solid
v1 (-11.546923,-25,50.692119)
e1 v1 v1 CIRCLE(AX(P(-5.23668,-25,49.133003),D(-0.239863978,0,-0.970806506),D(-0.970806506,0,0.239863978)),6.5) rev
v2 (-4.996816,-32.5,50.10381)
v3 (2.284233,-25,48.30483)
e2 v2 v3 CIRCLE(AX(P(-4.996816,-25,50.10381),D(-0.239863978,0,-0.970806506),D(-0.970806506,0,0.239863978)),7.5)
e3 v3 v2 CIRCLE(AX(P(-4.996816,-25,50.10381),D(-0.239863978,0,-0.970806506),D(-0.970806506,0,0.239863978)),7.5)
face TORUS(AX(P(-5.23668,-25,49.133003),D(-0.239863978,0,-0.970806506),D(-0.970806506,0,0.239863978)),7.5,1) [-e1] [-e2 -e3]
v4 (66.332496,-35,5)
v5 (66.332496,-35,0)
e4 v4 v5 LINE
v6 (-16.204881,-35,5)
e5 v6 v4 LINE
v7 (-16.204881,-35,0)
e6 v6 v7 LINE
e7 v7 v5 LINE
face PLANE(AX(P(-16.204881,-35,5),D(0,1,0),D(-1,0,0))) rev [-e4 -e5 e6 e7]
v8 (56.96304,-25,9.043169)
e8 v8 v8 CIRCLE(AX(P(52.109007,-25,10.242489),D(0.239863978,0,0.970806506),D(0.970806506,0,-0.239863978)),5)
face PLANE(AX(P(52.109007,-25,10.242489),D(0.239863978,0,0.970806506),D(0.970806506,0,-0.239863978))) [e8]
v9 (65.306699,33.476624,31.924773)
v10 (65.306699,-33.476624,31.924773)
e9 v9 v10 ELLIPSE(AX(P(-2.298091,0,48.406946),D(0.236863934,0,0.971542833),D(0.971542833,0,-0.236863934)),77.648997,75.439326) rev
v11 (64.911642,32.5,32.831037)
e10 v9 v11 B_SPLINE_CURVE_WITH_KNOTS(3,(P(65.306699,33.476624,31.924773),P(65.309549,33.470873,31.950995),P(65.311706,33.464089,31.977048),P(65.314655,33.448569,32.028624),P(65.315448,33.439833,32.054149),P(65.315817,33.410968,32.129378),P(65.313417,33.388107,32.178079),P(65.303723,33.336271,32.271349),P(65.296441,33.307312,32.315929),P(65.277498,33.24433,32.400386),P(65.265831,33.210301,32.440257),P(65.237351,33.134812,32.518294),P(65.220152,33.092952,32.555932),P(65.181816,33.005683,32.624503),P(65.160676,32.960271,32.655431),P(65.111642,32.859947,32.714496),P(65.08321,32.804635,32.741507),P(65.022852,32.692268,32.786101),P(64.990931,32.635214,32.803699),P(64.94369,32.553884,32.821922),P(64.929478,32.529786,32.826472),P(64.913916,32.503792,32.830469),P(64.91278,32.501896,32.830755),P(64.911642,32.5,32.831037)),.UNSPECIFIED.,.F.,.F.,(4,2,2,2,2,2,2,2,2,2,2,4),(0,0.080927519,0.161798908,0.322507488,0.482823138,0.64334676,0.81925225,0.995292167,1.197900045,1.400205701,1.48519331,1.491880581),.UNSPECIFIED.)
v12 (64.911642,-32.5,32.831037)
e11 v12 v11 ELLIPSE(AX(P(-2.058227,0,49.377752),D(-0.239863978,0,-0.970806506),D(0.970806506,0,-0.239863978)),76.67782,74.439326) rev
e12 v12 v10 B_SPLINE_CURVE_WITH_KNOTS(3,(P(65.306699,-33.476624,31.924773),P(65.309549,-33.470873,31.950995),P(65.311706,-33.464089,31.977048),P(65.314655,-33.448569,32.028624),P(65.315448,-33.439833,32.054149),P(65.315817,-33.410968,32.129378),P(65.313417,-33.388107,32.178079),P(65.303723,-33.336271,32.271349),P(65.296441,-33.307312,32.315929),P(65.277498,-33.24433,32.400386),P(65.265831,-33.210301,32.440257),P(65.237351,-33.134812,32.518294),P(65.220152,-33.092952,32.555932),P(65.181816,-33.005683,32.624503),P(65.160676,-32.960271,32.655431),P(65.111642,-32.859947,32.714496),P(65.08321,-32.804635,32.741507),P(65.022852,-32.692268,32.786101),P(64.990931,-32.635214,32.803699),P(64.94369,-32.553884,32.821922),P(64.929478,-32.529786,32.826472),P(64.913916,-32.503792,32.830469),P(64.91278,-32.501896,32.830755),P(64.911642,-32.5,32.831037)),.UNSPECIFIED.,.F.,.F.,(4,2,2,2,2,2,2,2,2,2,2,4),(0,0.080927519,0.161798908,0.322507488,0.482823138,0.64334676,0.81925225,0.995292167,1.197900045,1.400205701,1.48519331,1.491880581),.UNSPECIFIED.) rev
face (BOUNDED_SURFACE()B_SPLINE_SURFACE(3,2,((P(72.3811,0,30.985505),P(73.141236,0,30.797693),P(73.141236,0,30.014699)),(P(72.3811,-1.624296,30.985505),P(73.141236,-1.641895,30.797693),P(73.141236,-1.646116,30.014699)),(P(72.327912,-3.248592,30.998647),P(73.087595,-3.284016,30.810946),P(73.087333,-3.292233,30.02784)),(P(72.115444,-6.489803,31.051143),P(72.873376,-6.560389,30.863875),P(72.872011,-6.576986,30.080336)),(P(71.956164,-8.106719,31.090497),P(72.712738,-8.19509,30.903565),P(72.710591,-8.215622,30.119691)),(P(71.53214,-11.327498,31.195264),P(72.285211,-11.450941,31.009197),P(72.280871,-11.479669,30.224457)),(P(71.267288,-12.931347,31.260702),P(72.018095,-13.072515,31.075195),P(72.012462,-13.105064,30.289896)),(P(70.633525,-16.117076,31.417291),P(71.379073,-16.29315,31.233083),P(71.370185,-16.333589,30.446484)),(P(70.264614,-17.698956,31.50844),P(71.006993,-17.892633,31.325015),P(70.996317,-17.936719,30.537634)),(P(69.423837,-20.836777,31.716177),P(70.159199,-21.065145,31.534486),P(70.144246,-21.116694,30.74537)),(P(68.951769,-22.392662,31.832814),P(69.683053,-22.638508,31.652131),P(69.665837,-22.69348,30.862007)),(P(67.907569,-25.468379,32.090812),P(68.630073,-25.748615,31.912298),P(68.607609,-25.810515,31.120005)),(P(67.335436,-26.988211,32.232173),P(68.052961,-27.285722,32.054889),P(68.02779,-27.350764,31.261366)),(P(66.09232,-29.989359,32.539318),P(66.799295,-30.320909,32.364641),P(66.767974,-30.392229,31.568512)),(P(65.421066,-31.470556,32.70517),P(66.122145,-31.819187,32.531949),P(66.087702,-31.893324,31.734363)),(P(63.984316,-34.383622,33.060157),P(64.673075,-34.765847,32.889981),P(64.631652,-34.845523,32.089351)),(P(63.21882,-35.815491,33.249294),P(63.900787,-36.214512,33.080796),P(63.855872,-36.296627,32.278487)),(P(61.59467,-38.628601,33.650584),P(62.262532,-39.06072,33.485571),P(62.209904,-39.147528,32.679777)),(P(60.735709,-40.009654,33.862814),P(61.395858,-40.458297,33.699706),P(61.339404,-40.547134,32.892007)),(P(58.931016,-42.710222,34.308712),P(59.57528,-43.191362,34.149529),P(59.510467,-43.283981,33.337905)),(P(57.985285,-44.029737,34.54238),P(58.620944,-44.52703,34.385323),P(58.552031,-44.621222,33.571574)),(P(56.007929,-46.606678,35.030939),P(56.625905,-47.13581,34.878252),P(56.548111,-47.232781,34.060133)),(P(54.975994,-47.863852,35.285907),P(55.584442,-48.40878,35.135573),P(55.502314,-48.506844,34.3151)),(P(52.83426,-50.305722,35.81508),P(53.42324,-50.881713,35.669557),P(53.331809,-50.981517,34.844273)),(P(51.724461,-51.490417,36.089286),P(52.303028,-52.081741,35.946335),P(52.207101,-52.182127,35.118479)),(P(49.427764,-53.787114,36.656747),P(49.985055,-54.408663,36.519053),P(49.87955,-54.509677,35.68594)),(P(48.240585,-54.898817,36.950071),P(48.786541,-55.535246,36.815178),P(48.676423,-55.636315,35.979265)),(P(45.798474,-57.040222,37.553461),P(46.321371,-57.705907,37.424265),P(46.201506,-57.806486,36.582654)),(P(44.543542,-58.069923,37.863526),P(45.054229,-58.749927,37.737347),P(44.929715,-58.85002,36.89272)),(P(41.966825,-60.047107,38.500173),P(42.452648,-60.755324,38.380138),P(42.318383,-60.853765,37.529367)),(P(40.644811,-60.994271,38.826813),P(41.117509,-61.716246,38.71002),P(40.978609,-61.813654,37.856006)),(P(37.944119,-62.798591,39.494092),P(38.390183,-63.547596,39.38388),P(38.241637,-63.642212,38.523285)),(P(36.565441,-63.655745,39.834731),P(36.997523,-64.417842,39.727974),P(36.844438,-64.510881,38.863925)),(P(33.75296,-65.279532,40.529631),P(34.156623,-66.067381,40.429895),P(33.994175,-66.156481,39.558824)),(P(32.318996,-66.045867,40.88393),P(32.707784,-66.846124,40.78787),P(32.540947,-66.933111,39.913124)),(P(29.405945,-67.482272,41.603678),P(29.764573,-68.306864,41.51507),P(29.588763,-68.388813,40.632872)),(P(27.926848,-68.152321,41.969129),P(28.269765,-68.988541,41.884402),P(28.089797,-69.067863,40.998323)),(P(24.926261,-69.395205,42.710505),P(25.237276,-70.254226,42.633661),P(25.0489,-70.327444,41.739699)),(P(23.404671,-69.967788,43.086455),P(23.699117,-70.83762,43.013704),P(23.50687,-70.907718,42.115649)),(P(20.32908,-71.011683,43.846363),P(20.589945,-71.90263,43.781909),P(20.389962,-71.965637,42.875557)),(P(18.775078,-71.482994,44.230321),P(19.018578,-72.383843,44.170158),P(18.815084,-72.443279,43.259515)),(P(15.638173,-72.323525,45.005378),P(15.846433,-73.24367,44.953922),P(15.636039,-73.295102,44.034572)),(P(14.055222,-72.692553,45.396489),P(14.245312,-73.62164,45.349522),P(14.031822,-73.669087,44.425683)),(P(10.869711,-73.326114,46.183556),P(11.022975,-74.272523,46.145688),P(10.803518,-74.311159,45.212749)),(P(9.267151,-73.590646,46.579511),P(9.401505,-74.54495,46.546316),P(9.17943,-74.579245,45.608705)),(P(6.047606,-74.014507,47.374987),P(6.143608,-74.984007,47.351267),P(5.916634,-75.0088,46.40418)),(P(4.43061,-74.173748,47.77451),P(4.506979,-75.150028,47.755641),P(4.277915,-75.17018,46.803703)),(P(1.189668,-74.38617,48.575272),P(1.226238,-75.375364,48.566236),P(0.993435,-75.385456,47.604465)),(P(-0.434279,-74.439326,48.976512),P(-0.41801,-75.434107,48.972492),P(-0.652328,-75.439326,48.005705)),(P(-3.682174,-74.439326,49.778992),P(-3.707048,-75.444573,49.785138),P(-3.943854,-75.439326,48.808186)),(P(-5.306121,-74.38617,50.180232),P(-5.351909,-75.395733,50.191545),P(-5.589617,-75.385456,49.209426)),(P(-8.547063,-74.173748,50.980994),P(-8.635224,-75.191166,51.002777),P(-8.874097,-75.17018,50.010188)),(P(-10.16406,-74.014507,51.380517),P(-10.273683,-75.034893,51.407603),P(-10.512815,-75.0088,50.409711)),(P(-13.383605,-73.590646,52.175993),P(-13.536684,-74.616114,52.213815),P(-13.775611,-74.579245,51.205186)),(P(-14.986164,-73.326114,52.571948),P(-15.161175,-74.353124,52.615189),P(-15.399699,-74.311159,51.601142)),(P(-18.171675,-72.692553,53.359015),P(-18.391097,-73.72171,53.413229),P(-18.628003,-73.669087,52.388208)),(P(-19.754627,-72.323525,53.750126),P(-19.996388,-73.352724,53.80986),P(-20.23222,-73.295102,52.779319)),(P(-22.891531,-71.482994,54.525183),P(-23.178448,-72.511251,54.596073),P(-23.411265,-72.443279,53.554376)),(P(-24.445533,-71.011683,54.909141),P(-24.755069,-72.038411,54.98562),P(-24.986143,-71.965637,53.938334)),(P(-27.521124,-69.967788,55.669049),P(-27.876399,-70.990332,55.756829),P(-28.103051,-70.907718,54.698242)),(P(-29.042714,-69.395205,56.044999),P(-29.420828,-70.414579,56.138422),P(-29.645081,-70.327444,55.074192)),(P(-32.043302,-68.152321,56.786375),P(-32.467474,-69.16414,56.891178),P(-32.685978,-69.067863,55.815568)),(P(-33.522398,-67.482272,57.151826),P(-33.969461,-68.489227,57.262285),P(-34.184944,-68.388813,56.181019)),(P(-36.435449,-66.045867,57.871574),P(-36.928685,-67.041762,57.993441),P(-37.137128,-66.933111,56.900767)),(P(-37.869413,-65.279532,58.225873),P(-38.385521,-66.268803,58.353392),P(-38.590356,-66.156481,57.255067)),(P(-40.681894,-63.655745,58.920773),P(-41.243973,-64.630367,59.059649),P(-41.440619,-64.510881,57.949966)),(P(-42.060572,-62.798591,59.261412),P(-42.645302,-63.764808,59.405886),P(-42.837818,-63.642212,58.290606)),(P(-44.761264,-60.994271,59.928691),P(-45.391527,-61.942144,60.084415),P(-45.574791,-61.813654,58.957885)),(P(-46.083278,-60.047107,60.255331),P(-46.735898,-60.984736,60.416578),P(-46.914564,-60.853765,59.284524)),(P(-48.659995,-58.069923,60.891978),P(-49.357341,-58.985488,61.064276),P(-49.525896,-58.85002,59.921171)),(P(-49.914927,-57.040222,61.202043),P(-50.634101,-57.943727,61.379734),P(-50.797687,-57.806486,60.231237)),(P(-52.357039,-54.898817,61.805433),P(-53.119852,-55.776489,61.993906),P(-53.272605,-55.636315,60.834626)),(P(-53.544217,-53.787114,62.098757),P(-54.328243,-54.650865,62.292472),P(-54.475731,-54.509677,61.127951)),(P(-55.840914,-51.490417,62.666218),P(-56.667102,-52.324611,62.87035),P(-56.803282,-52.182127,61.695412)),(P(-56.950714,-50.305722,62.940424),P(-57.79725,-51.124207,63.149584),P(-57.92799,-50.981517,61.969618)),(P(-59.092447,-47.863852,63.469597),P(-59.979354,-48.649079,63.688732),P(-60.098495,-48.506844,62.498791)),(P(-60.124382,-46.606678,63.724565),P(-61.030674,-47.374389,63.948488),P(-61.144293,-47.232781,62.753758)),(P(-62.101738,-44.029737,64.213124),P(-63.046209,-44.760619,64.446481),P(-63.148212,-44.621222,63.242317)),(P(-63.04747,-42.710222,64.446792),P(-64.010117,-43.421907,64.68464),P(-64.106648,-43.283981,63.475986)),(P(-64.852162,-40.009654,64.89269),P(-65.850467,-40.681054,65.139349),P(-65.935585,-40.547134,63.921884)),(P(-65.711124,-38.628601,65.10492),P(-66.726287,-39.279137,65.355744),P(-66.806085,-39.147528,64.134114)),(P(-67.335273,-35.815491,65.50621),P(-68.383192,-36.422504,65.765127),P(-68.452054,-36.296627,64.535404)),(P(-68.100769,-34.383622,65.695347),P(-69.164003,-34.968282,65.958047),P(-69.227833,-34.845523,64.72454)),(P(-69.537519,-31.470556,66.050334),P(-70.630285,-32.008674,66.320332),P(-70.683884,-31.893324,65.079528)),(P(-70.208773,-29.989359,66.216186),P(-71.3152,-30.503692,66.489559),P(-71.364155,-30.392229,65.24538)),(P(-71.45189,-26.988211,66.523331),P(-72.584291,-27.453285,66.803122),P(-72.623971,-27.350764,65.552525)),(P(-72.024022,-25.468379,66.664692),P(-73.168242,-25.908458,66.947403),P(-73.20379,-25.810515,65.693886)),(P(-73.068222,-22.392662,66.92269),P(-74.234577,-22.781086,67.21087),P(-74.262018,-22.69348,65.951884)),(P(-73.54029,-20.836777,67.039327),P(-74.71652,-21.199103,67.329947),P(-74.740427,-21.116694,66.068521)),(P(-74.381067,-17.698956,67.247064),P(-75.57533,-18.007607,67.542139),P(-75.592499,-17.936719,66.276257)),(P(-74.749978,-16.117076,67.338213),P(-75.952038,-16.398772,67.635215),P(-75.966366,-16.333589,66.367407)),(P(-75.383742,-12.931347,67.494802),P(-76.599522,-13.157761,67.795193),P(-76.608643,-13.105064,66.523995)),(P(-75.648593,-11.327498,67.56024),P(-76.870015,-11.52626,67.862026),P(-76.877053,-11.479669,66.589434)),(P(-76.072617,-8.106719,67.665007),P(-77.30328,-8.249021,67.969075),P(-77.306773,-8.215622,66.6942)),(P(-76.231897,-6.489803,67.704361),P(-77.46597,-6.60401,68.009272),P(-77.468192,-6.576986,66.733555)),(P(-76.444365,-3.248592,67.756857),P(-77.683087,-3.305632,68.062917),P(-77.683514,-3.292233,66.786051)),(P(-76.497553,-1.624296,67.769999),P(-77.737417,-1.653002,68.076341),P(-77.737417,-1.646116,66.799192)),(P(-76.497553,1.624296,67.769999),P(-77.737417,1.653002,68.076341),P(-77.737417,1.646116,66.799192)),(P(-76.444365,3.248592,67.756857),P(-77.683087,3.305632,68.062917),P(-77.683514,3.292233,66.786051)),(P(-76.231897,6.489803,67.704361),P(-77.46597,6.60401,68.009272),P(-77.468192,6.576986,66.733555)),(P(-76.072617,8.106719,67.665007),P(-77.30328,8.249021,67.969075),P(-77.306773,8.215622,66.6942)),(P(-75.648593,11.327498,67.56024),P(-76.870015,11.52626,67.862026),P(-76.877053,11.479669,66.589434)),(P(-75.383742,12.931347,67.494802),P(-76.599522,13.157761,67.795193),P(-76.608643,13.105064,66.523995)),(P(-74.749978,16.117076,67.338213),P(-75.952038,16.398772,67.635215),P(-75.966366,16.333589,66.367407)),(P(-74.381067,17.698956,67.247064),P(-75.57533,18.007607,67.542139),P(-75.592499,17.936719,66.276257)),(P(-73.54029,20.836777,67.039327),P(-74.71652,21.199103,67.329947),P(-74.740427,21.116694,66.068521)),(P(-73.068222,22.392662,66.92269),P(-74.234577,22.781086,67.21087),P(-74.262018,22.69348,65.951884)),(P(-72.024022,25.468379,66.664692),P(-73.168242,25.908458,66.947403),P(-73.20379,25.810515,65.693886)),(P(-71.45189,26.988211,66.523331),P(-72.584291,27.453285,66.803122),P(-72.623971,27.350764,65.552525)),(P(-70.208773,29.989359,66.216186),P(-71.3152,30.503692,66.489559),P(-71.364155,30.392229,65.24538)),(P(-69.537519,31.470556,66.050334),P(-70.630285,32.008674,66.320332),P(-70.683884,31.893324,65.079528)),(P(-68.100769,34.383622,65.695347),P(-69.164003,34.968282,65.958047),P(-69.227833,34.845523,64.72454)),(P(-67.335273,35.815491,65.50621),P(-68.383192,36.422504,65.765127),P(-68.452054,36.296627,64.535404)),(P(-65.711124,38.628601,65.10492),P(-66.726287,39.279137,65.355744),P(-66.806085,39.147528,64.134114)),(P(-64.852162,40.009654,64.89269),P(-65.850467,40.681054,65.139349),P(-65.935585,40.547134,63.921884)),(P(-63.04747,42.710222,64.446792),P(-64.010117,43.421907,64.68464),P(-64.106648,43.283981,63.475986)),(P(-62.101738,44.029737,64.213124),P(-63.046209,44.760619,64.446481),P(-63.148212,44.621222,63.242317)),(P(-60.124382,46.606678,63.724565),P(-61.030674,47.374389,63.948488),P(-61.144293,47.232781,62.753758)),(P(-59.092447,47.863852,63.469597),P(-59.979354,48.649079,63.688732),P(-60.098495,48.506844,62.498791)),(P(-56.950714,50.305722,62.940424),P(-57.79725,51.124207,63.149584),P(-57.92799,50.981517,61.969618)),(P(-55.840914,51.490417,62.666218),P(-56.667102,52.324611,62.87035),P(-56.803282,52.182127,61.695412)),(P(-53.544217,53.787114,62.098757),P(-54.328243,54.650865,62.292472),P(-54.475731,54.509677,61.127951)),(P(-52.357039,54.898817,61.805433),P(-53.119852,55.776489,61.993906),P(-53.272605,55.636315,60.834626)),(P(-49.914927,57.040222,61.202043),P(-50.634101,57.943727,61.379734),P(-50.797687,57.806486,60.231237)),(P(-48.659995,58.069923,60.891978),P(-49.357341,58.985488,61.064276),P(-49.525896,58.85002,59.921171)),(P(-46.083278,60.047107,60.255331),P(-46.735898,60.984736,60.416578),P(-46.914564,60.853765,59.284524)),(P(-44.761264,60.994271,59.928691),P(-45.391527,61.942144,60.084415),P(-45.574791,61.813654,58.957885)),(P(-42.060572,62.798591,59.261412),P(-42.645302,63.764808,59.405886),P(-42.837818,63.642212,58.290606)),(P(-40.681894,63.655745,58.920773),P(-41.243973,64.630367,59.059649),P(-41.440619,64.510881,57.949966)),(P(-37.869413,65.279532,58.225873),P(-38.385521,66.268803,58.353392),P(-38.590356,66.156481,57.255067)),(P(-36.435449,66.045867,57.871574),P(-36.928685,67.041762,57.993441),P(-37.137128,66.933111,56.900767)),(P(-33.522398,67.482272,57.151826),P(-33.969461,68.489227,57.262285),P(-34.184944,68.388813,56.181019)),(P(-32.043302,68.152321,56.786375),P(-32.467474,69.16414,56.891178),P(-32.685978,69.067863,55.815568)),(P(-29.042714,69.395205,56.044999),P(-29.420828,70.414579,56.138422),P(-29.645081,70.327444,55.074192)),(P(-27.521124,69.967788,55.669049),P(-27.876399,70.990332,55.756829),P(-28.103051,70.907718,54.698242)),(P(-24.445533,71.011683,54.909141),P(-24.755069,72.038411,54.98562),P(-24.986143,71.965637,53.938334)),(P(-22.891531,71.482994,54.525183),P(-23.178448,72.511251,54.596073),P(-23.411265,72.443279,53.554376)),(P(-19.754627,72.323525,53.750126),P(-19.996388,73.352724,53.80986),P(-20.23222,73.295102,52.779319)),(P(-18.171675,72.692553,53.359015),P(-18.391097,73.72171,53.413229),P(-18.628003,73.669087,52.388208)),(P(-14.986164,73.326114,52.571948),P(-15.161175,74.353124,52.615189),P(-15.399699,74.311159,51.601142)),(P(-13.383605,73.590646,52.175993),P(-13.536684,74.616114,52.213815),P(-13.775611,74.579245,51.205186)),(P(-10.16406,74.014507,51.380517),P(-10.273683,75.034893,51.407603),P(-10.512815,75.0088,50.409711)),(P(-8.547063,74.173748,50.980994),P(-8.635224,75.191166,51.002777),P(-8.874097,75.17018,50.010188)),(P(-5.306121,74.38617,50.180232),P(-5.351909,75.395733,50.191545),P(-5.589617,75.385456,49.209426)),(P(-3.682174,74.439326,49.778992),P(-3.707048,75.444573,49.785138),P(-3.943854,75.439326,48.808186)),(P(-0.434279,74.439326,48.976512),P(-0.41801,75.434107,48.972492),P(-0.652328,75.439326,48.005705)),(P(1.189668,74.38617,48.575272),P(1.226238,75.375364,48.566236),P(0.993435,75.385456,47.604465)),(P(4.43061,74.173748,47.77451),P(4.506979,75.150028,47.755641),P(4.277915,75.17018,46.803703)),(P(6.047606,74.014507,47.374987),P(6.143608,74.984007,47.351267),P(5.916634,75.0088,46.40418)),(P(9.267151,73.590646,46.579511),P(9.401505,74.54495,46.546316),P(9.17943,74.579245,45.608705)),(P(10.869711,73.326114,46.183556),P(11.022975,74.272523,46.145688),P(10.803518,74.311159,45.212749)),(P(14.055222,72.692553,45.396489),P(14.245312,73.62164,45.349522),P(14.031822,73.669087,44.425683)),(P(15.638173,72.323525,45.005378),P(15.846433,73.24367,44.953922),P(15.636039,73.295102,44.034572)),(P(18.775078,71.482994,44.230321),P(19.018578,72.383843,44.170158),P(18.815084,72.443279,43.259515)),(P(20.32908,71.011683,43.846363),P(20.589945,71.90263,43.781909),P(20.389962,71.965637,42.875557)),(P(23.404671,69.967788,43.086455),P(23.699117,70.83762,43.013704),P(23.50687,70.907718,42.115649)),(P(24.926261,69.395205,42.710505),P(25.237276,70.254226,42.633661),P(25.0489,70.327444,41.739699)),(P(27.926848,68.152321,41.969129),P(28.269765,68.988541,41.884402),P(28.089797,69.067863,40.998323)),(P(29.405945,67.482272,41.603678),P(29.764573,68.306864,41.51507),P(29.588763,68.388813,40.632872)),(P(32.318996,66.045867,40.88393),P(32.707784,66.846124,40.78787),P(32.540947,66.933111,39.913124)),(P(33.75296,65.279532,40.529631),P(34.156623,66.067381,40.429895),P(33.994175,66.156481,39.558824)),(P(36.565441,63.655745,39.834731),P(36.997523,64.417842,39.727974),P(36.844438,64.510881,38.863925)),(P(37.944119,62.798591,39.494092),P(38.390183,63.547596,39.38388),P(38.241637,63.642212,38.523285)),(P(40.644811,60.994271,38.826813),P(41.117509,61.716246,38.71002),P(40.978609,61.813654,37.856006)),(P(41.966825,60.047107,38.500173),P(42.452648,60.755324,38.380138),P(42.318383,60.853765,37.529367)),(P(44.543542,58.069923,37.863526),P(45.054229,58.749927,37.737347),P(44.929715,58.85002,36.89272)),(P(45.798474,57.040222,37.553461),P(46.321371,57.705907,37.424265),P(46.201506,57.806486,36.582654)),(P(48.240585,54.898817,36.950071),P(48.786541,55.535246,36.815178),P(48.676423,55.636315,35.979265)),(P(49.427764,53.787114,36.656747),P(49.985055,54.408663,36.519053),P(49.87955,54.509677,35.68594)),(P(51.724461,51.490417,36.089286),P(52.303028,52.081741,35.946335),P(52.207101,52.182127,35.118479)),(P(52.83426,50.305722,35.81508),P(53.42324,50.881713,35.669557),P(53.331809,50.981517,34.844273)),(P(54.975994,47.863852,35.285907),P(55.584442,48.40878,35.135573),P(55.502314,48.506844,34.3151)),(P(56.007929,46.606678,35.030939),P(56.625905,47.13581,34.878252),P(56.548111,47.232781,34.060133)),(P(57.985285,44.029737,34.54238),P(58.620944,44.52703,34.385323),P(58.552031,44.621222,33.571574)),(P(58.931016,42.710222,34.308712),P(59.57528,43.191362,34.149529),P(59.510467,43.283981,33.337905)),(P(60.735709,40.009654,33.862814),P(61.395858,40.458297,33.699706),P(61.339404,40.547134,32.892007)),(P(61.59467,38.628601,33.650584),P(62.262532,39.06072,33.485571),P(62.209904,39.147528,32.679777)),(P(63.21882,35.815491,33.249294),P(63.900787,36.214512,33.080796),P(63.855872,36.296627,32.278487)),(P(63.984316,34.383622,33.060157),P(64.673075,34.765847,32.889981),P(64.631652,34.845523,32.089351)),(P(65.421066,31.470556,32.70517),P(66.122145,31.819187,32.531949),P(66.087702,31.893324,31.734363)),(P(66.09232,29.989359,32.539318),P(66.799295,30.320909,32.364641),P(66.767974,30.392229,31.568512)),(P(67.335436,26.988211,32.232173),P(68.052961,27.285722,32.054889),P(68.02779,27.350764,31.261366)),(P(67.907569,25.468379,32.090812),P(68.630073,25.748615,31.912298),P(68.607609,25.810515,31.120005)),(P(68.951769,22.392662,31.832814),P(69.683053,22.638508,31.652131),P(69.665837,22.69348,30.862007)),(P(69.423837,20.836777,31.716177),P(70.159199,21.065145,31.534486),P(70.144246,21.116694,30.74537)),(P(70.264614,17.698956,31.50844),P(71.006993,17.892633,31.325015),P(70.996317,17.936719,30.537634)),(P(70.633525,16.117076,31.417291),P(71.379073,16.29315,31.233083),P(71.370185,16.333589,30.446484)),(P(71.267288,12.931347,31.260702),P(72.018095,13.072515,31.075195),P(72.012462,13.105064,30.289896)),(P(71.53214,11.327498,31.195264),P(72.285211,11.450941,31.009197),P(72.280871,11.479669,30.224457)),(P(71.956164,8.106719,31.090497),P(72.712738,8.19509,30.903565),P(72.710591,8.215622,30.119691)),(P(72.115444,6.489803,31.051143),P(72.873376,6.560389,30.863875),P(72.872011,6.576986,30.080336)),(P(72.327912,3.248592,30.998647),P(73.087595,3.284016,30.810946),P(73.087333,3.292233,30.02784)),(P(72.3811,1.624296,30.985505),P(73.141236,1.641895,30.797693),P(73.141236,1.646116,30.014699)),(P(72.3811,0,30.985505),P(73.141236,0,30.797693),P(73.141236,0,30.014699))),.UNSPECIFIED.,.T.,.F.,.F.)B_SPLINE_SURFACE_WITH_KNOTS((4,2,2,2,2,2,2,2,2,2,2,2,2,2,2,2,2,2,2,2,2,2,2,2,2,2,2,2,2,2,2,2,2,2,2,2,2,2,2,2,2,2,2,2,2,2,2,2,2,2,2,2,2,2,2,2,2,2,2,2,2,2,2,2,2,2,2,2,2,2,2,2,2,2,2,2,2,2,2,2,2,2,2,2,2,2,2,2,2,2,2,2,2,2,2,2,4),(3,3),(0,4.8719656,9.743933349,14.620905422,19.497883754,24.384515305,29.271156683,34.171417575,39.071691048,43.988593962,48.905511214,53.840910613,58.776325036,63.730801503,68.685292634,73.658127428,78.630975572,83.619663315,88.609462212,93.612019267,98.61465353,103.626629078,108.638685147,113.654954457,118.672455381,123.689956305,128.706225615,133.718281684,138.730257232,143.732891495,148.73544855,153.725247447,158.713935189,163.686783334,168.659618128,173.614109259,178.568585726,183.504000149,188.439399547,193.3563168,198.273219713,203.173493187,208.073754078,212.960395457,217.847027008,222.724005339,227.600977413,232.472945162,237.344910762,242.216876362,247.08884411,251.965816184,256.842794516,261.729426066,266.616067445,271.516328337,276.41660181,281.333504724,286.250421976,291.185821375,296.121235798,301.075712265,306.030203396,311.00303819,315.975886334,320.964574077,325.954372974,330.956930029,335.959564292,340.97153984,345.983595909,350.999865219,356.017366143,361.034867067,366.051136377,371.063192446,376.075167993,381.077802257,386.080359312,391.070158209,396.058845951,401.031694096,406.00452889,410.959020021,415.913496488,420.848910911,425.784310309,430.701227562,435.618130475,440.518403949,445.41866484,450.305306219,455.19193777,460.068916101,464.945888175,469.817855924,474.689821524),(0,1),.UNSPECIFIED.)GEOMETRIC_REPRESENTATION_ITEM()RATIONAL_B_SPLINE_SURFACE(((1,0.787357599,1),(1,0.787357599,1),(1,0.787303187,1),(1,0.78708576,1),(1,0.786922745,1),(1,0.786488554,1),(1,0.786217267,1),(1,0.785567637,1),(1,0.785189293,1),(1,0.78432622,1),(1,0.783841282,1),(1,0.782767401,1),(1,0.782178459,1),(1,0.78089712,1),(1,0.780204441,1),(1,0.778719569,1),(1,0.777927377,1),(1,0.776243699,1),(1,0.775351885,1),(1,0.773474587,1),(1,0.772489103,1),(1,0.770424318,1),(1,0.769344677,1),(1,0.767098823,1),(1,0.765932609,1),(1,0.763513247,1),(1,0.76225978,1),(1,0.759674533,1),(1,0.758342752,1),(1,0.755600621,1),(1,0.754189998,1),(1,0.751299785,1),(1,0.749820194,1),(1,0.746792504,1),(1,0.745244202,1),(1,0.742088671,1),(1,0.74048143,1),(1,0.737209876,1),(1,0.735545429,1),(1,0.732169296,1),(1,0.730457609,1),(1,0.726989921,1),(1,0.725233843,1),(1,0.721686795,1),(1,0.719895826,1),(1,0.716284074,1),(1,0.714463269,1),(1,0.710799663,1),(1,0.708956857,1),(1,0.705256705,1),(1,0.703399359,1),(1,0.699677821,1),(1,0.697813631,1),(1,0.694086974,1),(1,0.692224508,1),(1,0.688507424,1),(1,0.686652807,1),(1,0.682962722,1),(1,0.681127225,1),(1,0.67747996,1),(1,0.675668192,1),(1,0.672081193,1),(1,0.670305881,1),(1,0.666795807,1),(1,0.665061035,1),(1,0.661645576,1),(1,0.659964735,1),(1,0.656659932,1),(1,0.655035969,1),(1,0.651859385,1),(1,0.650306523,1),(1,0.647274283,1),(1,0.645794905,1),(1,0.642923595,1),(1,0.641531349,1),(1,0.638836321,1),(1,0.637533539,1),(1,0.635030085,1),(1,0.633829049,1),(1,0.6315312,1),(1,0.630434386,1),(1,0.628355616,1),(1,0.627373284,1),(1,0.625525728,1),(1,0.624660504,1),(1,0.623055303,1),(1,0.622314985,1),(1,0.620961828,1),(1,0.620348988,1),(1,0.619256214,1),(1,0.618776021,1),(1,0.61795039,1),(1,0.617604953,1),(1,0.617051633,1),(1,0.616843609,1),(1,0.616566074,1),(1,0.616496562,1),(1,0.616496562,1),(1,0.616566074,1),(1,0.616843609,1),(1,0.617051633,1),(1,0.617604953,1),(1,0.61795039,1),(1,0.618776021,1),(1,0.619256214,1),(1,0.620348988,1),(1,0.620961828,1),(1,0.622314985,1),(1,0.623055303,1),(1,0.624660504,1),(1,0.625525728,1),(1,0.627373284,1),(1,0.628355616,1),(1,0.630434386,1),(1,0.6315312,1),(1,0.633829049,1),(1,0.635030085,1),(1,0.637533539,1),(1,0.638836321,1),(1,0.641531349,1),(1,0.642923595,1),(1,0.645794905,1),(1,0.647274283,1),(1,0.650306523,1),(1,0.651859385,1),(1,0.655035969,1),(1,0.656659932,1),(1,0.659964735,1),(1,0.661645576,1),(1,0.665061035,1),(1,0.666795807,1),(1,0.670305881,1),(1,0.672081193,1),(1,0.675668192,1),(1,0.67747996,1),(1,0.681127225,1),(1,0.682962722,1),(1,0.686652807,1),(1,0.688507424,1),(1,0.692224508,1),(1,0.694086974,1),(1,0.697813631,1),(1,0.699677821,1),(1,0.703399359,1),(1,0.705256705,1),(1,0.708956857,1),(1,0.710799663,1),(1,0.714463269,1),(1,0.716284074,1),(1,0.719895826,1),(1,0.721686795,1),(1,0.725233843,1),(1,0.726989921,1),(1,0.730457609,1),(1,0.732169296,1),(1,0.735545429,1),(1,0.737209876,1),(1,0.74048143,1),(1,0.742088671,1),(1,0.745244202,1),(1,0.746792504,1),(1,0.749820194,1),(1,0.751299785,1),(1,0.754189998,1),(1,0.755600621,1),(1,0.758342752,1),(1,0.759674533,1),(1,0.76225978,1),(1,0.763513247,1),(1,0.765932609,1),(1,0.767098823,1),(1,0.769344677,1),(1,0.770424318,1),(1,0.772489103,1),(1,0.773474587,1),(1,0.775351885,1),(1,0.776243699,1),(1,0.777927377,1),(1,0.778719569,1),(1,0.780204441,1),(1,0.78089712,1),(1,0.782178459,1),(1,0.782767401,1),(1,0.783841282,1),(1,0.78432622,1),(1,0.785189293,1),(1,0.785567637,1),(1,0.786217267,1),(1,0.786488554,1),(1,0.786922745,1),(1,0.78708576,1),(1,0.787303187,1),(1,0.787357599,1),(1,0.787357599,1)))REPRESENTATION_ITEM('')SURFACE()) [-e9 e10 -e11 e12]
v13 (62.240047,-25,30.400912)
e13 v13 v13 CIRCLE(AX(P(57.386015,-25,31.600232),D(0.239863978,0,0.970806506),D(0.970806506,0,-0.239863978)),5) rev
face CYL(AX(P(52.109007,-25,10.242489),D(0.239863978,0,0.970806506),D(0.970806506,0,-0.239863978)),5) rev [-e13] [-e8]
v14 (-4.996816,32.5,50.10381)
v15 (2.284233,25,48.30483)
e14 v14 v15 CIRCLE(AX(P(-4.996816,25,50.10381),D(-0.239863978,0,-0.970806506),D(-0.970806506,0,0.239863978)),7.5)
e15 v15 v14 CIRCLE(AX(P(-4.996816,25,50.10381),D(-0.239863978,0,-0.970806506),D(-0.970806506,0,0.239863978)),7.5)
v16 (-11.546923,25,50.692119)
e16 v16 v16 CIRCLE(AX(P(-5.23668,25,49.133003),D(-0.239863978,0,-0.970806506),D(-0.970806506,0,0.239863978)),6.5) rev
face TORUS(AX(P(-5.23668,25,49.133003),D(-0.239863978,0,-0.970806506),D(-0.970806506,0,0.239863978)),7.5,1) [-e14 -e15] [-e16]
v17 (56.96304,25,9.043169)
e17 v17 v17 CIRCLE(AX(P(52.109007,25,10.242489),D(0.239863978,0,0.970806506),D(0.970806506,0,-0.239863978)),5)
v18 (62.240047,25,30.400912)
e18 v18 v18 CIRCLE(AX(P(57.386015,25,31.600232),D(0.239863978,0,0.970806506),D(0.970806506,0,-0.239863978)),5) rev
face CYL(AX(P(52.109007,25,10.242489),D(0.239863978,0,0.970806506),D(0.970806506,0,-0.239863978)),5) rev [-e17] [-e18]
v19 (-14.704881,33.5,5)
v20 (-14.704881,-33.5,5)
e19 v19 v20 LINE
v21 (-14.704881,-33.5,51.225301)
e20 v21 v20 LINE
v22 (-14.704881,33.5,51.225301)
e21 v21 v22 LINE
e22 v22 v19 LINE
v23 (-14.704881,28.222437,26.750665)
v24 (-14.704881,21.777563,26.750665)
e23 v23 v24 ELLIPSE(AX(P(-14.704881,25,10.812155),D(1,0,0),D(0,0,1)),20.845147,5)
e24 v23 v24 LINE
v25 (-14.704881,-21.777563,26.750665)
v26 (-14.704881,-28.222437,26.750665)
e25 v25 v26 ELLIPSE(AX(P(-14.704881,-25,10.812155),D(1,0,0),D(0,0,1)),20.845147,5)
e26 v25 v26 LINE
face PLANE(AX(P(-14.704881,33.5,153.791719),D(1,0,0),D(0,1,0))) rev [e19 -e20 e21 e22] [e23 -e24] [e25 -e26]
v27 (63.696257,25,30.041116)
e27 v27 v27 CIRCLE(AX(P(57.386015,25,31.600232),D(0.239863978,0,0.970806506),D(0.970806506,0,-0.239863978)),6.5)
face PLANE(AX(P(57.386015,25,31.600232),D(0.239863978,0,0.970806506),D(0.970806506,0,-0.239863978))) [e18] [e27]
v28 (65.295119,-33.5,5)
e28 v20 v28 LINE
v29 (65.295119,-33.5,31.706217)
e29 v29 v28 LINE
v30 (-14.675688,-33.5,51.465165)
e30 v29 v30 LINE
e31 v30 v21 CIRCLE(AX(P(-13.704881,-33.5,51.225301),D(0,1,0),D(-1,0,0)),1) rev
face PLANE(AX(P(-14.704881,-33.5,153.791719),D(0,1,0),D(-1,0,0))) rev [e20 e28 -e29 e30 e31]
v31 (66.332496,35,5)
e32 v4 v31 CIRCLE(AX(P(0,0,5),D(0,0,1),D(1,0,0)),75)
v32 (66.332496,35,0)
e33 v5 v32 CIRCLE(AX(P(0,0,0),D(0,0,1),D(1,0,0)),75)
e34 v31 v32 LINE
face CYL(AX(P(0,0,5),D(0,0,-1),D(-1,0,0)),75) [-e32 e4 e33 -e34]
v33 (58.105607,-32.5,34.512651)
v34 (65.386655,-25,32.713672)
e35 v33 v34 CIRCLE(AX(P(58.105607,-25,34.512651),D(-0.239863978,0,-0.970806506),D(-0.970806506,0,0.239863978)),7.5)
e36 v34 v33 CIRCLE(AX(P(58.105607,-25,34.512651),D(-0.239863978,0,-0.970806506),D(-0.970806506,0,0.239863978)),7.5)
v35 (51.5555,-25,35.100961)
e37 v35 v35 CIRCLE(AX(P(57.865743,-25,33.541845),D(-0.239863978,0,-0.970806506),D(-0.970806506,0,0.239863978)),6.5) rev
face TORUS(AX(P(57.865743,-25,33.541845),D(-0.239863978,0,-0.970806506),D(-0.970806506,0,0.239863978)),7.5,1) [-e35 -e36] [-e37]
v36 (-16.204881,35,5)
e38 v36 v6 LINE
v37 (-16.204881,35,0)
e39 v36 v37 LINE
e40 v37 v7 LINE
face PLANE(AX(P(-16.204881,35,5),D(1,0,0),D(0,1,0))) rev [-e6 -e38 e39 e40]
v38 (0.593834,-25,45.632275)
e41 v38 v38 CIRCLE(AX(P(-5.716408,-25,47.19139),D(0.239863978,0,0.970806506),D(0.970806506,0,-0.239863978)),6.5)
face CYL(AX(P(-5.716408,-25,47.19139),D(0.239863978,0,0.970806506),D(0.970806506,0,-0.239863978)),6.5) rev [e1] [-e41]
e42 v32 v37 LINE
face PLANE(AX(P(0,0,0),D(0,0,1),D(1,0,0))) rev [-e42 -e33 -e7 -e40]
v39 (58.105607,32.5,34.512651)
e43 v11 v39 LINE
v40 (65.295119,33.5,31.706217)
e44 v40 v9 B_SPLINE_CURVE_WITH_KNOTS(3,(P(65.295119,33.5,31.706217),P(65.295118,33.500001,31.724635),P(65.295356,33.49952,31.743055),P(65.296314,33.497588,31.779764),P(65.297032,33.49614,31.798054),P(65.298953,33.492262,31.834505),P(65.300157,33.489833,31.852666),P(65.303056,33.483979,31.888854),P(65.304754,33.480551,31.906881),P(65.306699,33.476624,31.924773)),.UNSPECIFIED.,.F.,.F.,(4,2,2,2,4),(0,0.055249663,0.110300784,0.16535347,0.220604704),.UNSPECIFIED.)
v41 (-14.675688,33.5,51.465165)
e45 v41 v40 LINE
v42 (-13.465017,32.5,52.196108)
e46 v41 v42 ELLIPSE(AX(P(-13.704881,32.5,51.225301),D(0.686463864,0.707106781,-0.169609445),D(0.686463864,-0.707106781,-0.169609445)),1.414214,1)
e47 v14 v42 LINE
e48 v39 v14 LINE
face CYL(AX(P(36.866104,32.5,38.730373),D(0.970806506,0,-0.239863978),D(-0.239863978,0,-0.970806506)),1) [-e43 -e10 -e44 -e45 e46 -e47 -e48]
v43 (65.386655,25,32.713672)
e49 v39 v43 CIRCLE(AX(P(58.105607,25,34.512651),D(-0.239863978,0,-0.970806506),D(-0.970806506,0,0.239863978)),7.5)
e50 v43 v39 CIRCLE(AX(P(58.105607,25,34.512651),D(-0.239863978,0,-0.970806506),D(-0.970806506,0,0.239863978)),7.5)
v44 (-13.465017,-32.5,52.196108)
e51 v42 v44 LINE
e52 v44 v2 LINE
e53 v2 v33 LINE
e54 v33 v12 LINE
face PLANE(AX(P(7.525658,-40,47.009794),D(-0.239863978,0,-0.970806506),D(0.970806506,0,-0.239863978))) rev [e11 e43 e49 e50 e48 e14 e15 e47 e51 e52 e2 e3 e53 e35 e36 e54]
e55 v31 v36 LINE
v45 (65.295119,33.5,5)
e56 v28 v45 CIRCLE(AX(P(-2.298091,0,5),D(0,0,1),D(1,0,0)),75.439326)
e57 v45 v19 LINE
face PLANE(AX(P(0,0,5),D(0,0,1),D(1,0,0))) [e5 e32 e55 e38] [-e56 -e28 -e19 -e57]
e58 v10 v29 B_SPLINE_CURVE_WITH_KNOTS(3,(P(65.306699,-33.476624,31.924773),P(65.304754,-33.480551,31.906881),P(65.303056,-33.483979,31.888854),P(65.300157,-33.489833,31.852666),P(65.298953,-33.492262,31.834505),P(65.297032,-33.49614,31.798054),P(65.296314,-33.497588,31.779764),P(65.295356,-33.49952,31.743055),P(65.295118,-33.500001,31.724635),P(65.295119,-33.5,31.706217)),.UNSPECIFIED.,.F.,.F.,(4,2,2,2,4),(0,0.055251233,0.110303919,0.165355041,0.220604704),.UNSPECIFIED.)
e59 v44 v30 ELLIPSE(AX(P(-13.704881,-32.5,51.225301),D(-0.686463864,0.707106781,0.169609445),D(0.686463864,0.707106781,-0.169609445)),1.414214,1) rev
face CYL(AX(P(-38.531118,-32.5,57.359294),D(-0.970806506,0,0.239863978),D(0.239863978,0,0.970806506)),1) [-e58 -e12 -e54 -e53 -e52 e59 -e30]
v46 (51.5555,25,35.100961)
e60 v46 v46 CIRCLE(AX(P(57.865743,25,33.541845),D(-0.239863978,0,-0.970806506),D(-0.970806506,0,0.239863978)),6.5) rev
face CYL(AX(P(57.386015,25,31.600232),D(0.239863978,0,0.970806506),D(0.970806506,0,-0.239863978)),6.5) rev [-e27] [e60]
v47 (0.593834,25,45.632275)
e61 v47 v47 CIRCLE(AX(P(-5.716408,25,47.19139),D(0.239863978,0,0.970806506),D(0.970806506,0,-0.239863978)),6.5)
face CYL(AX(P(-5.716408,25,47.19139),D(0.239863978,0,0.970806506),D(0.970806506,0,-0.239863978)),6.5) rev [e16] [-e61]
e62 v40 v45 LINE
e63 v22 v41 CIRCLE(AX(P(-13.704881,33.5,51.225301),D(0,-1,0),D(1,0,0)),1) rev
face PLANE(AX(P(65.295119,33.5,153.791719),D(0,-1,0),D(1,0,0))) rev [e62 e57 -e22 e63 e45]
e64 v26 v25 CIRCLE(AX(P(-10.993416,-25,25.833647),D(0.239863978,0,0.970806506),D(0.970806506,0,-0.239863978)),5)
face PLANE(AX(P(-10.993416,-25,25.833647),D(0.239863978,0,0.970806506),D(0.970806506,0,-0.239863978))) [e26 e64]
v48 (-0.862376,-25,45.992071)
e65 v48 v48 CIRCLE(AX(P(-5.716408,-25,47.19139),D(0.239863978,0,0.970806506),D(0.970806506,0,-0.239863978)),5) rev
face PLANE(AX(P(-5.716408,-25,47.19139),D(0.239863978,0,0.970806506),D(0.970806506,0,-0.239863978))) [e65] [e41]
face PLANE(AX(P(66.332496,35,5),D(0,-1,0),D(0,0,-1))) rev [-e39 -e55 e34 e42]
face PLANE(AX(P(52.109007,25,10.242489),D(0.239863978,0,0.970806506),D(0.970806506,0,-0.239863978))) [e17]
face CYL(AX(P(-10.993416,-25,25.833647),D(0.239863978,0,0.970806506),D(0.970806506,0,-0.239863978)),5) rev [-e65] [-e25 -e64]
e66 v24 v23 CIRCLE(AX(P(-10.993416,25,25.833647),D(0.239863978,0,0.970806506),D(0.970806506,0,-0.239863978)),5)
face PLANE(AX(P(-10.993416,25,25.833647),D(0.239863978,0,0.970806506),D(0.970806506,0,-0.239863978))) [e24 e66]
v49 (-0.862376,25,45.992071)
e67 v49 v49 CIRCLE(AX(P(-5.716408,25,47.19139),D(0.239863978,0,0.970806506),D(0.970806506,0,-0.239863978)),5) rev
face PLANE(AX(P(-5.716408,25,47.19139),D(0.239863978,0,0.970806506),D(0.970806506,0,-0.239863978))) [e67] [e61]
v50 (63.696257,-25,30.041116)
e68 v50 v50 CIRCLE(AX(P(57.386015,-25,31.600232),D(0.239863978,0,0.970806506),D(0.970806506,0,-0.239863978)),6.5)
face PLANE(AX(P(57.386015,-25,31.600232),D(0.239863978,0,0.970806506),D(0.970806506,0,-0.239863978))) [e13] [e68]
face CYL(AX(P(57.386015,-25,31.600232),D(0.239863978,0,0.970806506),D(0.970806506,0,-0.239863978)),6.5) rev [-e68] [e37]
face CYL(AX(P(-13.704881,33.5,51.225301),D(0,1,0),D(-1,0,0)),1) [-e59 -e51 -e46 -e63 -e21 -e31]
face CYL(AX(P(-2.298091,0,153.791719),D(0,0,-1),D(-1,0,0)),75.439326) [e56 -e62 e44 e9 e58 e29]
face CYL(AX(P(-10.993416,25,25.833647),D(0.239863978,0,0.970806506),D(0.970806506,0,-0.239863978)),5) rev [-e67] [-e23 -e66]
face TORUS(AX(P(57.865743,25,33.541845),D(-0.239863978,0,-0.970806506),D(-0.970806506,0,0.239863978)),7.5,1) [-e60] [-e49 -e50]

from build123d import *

# Parameters (mm, degrees)
BOSS_EXTRUDE1_DEPTH = 5
BOSS_EXTRUDE2_REACH = 84.916
SKETCH3_R           = 5
CUT_EXTRUDE1_DEPTH  = 25
SKETCH4_R           = 6.5
CUT_EXTRUDE2_DEPTH  = 3
FILLET1_R           = 1


with BuildPart() as part:
    # Sketch1 → Boss-Extrude1 (new body)
    with BuildSketch(Plane.XY):
        with BuildLine():
            Line((-16.204881352, 35), (-16.204881352, -35))
            Line((-16.204881352, -35), (66.332495807, -35))
            ThreePointArc((66.332495807, -35), (75, 0), (66.332495807, 35))
            Line((66.332495807, 35), (-16.204881352, 35))
        make_face()
    extrude(amount=BOSS_EXTRUDE1_DEPTH)

    # Boss-Extrude2: up to this plane
    boss_extrude2_end = Plane(origin=(7.525658293, -40, 47.009794297), z_dir=(-0.239863978039186, 0, -0.9708065059728519))
    # Sketch2 → Boss-Extrude2 (add, up to the surface)
    with BuildSketch(Plane.XY.offset(5), mode=Mode.PRIVATE) as boss_extrude2_sk1:
        with BuildLine():
            Line((65.295118648, 33.5), (-14.704881352, 33.5))
            Line((-14.704881352, 33.5), (-14.704881352, -33.5))
            Line((-14.704881352, -33.5), (65.295118648, -33.5))
            ThreePointArc((65.295118648, -33.5), (73.141235595, 0), (65.295118648, 33.5))
        make_face()
    boss_extrude2_tool1 = split(extrude(boss_extrude2_sk1.sketch, amount=BOSS_EXTRUDE2_REACH, mode=Mode.PRIVATE), bisect_by=boss_extrude2_end, keep=Keep.BOTH, mode=Mode.PRIVATE)
    add(boss_extrude2_tool1.solids().sort_by_distance((27.970522, 0, 5))[0])

    # Sketch3 → Cut-Extrude1 (cut)
    with BuildSketch(Plane(origin=(11.379758408, 0, 46.057534728), x_dir=(0.970806505972852, 0, -0.23986397803918558), z_dir=(0.2398639780391856, 0, 0.9708065059728521))):
        with Locations((-16.869040946, 25)):
            Circle(SKETCH3_R)
        with Locations((-16.869040946, -25)):
            Circle(SKETCH3_R)
        with Locations((48.130959054, -25)):
            Circle(SKETCH3_R)
        with Locations((48.130959054, 25)):
            Circle(SKETCH3_R)
    extrude(amount=-CUT_EXTRUDE1_DEPTH, mode=Mode.SUBTRACT)

    # Sketch4 → Cut-Extrude2 (cut)
    with BuildSketch(Plane(origin=(11.379758408, 0, 46.057534728), x_dir=(0.970806505972852, 0, -0.23986397803918558), z_dir=(0.2398639780391856, 0, 0.9708065059728521))):
        with Locations((-16.869040946, 25)):
            Circle(SKETCH4_R)
        with Locations((-16.869040946, -25)):
            Circle(SKETCH4_R)
        with Locations((48.130959054, -25)):
            Circle(SKETCH4_R)
        with Locations((48.130959054, 25)):
            Circle(SKETCH4_R)
    extrude(amount=-CUT_EXTRUDE2_DEPTH, mode=Mode.SUBTRACT)

    # Fillet1
    fillet1_edges = [part.edges().sort_by_distance(p)[0] for p in [
        (25.295118648, -33.5, 42.619368994),
        (-14.704881352, 0, 52.502449775),
        (25.295118648, 33.5, 42.619368994),
        (73.141235595, 0, 30.797693023),
        (-11.307058581, 25, 51.662925852),
        (51.795364307, 25, 36.07176728),
        (51.795364307, -25, 36.07176728),
        (-11.307058581, -25, 51.662925852),
    ]]
    fillet(fillet1_edges, radius=FILLET1_R - 0.0001)  # a hair under: the kernel refuses the full size


solid = part.part
